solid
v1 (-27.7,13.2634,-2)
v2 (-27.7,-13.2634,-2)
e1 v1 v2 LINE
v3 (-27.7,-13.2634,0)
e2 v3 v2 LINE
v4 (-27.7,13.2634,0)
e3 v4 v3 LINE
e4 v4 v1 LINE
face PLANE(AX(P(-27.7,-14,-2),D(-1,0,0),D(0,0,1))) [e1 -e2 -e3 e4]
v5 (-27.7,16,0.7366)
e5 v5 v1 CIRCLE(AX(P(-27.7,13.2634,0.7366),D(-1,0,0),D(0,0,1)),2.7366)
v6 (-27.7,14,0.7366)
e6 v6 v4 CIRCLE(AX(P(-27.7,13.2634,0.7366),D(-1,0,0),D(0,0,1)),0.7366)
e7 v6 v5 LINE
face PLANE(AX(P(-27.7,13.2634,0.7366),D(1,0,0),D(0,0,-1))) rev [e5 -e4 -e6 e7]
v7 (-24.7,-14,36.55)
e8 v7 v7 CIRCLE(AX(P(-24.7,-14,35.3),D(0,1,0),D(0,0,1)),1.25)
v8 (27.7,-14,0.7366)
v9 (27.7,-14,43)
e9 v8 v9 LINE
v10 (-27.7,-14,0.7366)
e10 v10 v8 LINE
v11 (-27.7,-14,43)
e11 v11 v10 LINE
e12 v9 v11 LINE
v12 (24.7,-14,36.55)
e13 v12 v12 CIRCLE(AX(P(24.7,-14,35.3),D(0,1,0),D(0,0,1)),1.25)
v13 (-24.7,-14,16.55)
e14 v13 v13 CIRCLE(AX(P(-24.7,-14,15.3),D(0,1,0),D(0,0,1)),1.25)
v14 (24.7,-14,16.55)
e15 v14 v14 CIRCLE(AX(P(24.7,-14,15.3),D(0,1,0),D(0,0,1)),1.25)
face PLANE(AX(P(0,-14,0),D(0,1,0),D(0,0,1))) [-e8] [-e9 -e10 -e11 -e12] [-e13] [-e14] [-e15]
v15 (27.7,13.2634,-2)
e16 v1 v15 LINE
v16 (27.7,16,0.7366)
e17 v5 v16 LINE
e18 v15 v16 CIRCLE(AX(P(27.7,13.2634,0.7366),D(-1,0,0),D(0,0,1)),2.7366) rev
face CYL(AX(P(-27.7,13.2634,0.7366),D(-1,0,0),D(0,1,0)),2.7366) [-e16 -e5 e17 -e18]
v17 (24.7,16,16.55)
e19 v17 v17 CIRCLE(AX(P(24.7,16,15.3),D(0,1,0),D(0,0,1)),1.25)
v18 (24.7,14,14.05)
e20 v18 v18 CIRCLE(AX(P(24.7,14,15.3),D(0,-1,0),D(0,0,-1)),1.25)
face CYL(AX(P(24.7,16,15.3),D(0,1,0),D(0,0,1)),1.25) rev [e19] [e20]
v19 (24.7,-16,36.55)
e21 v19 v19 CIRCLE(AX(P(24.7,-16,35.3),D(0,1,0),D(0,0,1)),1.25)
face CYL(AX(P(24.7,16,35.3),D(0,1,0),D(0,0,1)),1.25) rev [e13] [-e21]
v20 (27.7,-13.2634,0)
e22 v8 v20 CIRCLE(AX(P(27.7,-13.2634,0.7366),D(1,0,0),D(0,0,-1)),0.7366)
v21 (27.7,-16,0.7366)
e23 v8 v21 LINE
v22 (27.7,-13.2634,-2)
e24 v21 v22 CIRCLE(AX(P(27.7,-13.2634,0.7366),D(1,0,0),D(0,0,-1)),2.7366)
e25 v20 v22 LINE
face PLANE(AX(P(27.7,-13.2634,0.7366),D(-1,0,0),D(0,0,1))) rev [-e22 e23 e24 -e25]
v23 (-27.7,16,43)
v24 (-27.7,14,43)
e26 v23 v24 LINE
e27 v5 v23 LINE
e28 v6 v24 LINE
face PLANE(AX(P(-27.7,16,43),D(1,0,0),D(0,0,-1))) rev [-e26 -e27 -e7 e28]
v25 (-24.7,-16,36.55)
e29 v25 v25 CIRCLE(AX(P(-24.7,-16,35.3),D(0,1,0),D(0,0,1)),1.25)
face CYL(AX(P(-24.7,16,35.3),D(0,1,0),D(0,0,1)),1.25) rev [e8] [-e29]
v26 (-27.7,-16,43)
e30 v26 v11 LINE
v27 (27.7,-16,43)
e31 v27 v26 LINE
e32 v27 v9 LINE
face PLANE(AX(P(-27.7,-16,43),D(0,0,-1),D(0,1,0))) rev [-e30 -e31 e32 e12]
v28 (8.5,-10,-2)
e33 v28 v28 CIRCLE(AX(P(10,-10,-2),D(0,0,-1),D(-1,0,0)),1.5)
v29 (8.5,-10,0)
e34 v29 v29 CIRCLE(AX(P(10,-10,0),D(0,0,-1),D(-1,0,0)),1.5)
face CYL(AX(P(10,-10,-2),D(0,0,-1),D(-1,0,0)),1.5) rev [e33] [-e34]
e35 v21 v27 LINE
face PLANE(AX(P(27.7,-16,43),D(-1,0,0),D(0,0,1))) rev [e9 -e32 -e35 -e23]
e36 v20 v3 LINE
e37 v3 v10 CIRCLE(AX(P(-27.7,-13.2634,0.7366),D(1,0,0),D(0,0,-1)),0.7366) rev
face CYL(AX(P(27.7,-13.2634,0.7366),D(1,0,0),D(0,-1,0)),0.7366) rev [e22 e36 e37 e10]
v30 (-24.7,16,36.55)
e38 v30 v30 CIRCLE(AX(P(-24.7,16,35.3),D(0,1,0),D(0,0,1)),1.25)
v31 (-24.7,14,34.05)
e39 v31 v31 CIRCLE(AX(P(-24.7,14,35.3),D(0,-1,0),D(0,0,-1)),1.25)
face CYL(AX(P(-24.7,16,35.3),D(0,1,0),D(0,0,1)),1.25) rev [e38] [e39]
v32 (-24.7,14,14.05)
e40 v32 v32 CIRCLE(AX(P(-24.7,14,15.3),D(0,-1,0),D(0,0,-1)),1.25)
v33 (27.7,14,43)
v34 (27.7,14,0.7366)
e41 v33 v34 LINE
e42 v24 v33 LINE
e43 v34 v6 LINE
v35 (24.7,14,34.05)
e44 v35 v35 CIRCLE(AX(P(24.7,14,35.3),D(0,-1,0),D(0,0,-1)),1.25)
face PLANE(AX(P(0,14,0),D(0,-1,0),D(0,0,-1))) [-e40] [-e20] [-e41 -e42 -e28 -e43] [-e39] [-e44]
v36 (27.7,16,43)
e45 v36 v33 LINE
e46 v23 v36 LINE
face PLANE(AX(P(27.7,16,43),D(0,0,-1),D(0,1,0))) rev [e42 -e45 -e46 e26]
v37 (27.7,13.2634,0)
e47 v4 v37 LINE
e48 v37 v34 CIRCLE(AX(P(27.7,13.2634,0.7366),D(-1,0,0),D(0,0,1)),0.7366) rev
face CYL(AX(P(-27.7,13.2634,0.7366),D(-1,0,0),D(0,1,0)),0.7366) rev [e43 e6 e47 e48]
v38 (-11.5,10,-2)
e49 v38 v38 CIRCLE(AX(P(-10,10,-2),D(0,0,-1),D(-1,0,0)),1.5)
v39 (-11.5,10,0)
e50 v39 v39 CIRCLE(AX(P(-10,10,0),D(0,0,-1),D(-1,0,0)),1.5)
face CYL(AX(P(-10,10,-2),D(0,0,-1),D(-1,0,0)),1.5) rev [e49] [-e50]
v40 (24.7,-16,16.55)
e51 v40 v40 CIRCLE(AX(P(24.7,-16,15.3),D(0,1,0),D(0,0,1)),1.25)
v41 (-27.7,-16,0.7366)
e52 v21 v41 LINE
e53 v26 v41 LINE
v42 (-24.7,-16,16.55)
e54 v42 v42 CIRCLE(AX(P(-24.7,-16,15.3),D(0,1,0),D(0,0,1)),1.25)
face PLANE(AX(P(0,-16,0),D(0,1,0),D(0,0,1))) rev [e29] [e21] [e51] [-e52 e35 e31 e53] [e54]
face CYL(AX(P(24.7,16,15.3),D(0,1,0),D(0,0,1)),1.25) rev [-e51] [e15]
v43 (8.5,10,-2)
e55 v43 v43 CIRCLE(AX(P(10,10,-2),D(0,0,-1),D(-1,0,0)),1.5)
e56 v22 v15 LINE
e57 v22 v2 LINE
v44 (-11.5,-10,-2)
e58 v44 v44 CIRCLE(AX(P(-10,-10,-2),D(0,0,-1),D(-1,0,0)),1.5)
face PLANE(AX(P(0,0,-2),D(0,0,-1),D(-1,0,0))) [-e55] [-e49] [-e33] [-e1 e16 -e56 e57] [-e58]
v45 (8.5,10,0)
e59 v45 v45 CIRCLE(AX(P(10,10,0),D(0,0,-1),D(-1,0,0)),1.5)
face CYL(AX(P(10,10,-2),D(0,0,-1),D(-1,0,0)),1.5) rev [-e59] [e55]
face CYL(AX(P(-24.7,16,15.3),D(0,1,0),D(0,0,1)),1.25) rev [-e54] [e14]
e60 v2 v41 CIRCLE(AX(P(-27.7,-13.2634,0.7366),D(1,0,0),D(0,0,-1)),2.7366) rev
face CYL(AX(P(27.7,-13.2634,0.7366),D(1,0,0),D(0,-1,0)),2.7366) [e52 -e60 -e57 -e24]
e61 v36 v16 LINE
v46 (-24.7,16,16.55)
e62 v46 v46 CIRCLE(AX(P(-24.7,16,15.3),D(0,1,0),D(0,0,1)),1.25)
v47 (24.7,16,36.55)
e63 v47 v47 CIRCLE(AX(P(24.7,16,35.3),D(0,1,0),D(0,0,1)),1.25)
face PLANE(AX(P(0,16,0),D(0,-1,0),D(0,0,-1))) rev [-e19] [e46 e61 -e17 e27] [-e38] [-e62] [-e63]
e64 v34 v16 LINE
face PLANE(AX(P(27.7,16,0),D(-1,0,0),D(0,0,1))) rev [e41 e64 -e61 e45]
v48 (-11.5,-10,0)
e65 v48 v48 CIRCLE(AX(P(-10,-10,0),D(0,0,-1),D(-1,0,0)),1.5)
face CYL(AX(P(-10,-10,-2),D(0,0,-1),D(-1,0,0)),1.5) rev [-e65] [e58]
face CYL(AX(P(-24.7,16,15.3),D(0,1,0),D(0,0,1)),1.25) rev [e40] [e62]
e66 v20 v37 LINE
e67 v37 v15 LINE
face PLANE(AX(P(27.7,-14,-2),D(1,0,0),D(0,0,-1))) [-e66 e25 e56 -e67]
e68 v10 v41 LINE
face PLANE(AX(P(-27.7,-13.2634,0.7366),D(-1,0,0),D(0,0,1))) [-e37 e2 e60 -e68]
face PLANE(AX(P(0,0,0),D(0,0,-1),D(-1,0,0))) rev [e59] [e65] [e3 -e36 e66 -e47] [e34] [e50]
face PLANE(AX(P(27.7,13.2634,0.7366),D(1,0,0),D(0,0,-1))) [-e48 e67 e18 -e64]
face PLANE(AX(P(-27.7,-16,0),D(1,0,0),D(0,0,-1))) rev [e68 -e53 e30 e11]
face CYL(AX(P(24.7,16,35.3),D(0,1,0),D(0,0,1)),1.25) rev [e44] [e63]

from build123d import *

# Parameters (mm, degrees)
SZKIC1_W                             = 55.4
SZKIC1_H                             = 28
ODGI_CIE_BAZOWE1_DEPTH               = 2
OTWORY_USTALAJ_CE_3_0MM1_D           = 3
OTWORY_USTALAJ_CE_3_0MM1_DEPTH       = 17
OTWORY_USTALAJ_CE_3_0MM1_TIP         = 0.901290929
ODGI_CIE_KRAW_DZI1_STRIP_W           = 9.4732
ODGI_CIE_KRAW_DZI1_STRIP_H           = 2
ODGI_CIE_KRAW_DZI1_STRIP_CUT_DEPTH   = 55.4
ODGI_CIE_KRAW_DZI1_STRIP_2_W         = 9.4732
ODGI_CIE_KRAW_DZI1_STRIP_2_H         = 2
ODGI_CIE_KRAW_DZI1_STRIP_CUT_2_DEPTH = 55.4
ODGI_CIE_KRAW_DZI1_DEPTH             = 55.4
ODGI_CIE_KRAW_DZI1_BEND_DEPTH        = 55.4
OTW_R_GWINTOWANY_M3X0_51_D           = 2.5


# Sheet-metal steps are written as plain solids
with BuildPart() as part:
    # Szkic1 → Odgięcie bazowe1 (new body)
    with BuildSketch(Plane.XY):
        Rectangle(SZKIC1_W, SZKIC1_H)
    extrude(amount=-ODGI_CIE_BAZOWE1_DEPTH)

    # Otwory ustalające Ø3.0mm1
    with Locations(Plane(origin=(0, 0, -2), x_dir=(-1, 0, 0), z_dir=(0, 0, -1))):
        with Locations((-10, 10), (10, 10), (10, -10), (-10, -10)):
            Hole(OTWORY_USTALAJ_CE_3_0MM1_D / 2, depth=OTWORY_USTALAJ_CE_3_0MM1_DEPTH)
            with Locations((0, 0, -(OTWORY_USTALAJ_CE_3_0MM1_DEPTH + OTWORY_USTALAJ_CE_3_0MM1_TIP / 2))):  # 118° drill point
                Cone(0, OTWORY_USTALAJ_CE_3_0MM1_D / 2, OTWORY_USTALAJ_CE_3_0MM1_TIP, mode=Mode.SUBTRACT)

    # Odgięcie krawędzi1 strip (across the edge) → Odgięcie krawędzi1 strip cut (cut)
    with BuildSketch(Plane(origin=(27.7, 14, 0), x_dir=(0, -1, 0), z_dir=(-1, 0, 0))):
        with Locations((-4, -1)):
            Rectangle(ODGI_CIE_KRAW_DZI1_STRIP_W, ODGI_CIE_KRAW_DZI1_STRIP_H)
    extrude(amount=ODGI_CIE_KRAW_DZI1_STRIP_CUT_DEPTH, mode=Mode.SUBTRACT)

    # Odgięcie krawędzi1 strip 2 (across the edge) → Odgięcie krawędzi1 strip cut 2 (cut)
    with BuildSketch(Plane(origin=(-27.7, -14, 0), x_dir=(0, 1, 0), z_dir=(1, 0, 0))):
        with Locations((-4, -1)):
            Rectangle(ODGI_CIE_KRAW_DZI1_STRIP_2_W, ODGI_CIE_KRAW_DZI1_STRIP_2_H)
    extrude(amount=ODGI_CIE_KRAW_DZI1_STRIP_CUT_2_DEPTH, mode=Mode.SUBTRACT)

    # Odgięcie krawędzi1 section (across the edge) → Odgięcie krawędzi1 (add)
    with BuildSketch(Plane(origin=(27.7, 14, 0), x_dir=(0, -1, 0), z_dir=(-1, 0, 0))):
        with BuildLine():
            Line((-2, 0.7366), (-2, 43))
            Line((-2, 43), (0, 43))
            Line((0, 43), (0, 0.7366))
            ThreePointArc((0, 0.7366), (0.215745145, 0.215745145), (0.7366, 0))
            Line((0.7366, 0), (0.7366, -2))
            ThreePointArc((0.7366, -2), (-1.198468417, -1.198468417), (-2, 0.7366))
        make_face()
    extrude(amount=ODGI_CIE_KRAW_DZI1_DEPTH)

    # Odgięcie krawędzi1 section 2 (across the edge) → Odgięcie krawędzi1 bend (add)
    with BuildSketch(Plane(origin=(-27.7, -14, 0), x_dir=(0, 1, 0), z_dir=(1, 0, 0))):
        with BuildLine():
            Line((-2, 0.7366), (-2, 43))
            Line((-2, 43), (0, 43))
            Line((0, 43), (0, 0.7366))
            ThreePointArc((0, 0.7366), (0.215745145, 0.215745145), (0.7366, 0))
            Line((0.7366, 0), (0.7366, -2))
            ThreePointArc((0.7366, -2), (-1.198468417, -1.198468417), (-2, 0.7366))
        make_face()
    extrude(amount=ODGI_CIE_KRAW_DZI1_BEND_DEPTH)

    # Otwór gwintowany M3x0.51 (through all)
    with Locations(Plane(origin=(0, 16, 0), x_dir=(1, 0, 0), z_dir=(0, 1, 0))):
        with Locations((-24.7, -35.3), (-24.7, -15.3), (24.7, -35.3), (24.7, -15.3)):
            Hole(OTW_R_GWINTOWANY_M3X0_51_D / 2)


solid = part.part
